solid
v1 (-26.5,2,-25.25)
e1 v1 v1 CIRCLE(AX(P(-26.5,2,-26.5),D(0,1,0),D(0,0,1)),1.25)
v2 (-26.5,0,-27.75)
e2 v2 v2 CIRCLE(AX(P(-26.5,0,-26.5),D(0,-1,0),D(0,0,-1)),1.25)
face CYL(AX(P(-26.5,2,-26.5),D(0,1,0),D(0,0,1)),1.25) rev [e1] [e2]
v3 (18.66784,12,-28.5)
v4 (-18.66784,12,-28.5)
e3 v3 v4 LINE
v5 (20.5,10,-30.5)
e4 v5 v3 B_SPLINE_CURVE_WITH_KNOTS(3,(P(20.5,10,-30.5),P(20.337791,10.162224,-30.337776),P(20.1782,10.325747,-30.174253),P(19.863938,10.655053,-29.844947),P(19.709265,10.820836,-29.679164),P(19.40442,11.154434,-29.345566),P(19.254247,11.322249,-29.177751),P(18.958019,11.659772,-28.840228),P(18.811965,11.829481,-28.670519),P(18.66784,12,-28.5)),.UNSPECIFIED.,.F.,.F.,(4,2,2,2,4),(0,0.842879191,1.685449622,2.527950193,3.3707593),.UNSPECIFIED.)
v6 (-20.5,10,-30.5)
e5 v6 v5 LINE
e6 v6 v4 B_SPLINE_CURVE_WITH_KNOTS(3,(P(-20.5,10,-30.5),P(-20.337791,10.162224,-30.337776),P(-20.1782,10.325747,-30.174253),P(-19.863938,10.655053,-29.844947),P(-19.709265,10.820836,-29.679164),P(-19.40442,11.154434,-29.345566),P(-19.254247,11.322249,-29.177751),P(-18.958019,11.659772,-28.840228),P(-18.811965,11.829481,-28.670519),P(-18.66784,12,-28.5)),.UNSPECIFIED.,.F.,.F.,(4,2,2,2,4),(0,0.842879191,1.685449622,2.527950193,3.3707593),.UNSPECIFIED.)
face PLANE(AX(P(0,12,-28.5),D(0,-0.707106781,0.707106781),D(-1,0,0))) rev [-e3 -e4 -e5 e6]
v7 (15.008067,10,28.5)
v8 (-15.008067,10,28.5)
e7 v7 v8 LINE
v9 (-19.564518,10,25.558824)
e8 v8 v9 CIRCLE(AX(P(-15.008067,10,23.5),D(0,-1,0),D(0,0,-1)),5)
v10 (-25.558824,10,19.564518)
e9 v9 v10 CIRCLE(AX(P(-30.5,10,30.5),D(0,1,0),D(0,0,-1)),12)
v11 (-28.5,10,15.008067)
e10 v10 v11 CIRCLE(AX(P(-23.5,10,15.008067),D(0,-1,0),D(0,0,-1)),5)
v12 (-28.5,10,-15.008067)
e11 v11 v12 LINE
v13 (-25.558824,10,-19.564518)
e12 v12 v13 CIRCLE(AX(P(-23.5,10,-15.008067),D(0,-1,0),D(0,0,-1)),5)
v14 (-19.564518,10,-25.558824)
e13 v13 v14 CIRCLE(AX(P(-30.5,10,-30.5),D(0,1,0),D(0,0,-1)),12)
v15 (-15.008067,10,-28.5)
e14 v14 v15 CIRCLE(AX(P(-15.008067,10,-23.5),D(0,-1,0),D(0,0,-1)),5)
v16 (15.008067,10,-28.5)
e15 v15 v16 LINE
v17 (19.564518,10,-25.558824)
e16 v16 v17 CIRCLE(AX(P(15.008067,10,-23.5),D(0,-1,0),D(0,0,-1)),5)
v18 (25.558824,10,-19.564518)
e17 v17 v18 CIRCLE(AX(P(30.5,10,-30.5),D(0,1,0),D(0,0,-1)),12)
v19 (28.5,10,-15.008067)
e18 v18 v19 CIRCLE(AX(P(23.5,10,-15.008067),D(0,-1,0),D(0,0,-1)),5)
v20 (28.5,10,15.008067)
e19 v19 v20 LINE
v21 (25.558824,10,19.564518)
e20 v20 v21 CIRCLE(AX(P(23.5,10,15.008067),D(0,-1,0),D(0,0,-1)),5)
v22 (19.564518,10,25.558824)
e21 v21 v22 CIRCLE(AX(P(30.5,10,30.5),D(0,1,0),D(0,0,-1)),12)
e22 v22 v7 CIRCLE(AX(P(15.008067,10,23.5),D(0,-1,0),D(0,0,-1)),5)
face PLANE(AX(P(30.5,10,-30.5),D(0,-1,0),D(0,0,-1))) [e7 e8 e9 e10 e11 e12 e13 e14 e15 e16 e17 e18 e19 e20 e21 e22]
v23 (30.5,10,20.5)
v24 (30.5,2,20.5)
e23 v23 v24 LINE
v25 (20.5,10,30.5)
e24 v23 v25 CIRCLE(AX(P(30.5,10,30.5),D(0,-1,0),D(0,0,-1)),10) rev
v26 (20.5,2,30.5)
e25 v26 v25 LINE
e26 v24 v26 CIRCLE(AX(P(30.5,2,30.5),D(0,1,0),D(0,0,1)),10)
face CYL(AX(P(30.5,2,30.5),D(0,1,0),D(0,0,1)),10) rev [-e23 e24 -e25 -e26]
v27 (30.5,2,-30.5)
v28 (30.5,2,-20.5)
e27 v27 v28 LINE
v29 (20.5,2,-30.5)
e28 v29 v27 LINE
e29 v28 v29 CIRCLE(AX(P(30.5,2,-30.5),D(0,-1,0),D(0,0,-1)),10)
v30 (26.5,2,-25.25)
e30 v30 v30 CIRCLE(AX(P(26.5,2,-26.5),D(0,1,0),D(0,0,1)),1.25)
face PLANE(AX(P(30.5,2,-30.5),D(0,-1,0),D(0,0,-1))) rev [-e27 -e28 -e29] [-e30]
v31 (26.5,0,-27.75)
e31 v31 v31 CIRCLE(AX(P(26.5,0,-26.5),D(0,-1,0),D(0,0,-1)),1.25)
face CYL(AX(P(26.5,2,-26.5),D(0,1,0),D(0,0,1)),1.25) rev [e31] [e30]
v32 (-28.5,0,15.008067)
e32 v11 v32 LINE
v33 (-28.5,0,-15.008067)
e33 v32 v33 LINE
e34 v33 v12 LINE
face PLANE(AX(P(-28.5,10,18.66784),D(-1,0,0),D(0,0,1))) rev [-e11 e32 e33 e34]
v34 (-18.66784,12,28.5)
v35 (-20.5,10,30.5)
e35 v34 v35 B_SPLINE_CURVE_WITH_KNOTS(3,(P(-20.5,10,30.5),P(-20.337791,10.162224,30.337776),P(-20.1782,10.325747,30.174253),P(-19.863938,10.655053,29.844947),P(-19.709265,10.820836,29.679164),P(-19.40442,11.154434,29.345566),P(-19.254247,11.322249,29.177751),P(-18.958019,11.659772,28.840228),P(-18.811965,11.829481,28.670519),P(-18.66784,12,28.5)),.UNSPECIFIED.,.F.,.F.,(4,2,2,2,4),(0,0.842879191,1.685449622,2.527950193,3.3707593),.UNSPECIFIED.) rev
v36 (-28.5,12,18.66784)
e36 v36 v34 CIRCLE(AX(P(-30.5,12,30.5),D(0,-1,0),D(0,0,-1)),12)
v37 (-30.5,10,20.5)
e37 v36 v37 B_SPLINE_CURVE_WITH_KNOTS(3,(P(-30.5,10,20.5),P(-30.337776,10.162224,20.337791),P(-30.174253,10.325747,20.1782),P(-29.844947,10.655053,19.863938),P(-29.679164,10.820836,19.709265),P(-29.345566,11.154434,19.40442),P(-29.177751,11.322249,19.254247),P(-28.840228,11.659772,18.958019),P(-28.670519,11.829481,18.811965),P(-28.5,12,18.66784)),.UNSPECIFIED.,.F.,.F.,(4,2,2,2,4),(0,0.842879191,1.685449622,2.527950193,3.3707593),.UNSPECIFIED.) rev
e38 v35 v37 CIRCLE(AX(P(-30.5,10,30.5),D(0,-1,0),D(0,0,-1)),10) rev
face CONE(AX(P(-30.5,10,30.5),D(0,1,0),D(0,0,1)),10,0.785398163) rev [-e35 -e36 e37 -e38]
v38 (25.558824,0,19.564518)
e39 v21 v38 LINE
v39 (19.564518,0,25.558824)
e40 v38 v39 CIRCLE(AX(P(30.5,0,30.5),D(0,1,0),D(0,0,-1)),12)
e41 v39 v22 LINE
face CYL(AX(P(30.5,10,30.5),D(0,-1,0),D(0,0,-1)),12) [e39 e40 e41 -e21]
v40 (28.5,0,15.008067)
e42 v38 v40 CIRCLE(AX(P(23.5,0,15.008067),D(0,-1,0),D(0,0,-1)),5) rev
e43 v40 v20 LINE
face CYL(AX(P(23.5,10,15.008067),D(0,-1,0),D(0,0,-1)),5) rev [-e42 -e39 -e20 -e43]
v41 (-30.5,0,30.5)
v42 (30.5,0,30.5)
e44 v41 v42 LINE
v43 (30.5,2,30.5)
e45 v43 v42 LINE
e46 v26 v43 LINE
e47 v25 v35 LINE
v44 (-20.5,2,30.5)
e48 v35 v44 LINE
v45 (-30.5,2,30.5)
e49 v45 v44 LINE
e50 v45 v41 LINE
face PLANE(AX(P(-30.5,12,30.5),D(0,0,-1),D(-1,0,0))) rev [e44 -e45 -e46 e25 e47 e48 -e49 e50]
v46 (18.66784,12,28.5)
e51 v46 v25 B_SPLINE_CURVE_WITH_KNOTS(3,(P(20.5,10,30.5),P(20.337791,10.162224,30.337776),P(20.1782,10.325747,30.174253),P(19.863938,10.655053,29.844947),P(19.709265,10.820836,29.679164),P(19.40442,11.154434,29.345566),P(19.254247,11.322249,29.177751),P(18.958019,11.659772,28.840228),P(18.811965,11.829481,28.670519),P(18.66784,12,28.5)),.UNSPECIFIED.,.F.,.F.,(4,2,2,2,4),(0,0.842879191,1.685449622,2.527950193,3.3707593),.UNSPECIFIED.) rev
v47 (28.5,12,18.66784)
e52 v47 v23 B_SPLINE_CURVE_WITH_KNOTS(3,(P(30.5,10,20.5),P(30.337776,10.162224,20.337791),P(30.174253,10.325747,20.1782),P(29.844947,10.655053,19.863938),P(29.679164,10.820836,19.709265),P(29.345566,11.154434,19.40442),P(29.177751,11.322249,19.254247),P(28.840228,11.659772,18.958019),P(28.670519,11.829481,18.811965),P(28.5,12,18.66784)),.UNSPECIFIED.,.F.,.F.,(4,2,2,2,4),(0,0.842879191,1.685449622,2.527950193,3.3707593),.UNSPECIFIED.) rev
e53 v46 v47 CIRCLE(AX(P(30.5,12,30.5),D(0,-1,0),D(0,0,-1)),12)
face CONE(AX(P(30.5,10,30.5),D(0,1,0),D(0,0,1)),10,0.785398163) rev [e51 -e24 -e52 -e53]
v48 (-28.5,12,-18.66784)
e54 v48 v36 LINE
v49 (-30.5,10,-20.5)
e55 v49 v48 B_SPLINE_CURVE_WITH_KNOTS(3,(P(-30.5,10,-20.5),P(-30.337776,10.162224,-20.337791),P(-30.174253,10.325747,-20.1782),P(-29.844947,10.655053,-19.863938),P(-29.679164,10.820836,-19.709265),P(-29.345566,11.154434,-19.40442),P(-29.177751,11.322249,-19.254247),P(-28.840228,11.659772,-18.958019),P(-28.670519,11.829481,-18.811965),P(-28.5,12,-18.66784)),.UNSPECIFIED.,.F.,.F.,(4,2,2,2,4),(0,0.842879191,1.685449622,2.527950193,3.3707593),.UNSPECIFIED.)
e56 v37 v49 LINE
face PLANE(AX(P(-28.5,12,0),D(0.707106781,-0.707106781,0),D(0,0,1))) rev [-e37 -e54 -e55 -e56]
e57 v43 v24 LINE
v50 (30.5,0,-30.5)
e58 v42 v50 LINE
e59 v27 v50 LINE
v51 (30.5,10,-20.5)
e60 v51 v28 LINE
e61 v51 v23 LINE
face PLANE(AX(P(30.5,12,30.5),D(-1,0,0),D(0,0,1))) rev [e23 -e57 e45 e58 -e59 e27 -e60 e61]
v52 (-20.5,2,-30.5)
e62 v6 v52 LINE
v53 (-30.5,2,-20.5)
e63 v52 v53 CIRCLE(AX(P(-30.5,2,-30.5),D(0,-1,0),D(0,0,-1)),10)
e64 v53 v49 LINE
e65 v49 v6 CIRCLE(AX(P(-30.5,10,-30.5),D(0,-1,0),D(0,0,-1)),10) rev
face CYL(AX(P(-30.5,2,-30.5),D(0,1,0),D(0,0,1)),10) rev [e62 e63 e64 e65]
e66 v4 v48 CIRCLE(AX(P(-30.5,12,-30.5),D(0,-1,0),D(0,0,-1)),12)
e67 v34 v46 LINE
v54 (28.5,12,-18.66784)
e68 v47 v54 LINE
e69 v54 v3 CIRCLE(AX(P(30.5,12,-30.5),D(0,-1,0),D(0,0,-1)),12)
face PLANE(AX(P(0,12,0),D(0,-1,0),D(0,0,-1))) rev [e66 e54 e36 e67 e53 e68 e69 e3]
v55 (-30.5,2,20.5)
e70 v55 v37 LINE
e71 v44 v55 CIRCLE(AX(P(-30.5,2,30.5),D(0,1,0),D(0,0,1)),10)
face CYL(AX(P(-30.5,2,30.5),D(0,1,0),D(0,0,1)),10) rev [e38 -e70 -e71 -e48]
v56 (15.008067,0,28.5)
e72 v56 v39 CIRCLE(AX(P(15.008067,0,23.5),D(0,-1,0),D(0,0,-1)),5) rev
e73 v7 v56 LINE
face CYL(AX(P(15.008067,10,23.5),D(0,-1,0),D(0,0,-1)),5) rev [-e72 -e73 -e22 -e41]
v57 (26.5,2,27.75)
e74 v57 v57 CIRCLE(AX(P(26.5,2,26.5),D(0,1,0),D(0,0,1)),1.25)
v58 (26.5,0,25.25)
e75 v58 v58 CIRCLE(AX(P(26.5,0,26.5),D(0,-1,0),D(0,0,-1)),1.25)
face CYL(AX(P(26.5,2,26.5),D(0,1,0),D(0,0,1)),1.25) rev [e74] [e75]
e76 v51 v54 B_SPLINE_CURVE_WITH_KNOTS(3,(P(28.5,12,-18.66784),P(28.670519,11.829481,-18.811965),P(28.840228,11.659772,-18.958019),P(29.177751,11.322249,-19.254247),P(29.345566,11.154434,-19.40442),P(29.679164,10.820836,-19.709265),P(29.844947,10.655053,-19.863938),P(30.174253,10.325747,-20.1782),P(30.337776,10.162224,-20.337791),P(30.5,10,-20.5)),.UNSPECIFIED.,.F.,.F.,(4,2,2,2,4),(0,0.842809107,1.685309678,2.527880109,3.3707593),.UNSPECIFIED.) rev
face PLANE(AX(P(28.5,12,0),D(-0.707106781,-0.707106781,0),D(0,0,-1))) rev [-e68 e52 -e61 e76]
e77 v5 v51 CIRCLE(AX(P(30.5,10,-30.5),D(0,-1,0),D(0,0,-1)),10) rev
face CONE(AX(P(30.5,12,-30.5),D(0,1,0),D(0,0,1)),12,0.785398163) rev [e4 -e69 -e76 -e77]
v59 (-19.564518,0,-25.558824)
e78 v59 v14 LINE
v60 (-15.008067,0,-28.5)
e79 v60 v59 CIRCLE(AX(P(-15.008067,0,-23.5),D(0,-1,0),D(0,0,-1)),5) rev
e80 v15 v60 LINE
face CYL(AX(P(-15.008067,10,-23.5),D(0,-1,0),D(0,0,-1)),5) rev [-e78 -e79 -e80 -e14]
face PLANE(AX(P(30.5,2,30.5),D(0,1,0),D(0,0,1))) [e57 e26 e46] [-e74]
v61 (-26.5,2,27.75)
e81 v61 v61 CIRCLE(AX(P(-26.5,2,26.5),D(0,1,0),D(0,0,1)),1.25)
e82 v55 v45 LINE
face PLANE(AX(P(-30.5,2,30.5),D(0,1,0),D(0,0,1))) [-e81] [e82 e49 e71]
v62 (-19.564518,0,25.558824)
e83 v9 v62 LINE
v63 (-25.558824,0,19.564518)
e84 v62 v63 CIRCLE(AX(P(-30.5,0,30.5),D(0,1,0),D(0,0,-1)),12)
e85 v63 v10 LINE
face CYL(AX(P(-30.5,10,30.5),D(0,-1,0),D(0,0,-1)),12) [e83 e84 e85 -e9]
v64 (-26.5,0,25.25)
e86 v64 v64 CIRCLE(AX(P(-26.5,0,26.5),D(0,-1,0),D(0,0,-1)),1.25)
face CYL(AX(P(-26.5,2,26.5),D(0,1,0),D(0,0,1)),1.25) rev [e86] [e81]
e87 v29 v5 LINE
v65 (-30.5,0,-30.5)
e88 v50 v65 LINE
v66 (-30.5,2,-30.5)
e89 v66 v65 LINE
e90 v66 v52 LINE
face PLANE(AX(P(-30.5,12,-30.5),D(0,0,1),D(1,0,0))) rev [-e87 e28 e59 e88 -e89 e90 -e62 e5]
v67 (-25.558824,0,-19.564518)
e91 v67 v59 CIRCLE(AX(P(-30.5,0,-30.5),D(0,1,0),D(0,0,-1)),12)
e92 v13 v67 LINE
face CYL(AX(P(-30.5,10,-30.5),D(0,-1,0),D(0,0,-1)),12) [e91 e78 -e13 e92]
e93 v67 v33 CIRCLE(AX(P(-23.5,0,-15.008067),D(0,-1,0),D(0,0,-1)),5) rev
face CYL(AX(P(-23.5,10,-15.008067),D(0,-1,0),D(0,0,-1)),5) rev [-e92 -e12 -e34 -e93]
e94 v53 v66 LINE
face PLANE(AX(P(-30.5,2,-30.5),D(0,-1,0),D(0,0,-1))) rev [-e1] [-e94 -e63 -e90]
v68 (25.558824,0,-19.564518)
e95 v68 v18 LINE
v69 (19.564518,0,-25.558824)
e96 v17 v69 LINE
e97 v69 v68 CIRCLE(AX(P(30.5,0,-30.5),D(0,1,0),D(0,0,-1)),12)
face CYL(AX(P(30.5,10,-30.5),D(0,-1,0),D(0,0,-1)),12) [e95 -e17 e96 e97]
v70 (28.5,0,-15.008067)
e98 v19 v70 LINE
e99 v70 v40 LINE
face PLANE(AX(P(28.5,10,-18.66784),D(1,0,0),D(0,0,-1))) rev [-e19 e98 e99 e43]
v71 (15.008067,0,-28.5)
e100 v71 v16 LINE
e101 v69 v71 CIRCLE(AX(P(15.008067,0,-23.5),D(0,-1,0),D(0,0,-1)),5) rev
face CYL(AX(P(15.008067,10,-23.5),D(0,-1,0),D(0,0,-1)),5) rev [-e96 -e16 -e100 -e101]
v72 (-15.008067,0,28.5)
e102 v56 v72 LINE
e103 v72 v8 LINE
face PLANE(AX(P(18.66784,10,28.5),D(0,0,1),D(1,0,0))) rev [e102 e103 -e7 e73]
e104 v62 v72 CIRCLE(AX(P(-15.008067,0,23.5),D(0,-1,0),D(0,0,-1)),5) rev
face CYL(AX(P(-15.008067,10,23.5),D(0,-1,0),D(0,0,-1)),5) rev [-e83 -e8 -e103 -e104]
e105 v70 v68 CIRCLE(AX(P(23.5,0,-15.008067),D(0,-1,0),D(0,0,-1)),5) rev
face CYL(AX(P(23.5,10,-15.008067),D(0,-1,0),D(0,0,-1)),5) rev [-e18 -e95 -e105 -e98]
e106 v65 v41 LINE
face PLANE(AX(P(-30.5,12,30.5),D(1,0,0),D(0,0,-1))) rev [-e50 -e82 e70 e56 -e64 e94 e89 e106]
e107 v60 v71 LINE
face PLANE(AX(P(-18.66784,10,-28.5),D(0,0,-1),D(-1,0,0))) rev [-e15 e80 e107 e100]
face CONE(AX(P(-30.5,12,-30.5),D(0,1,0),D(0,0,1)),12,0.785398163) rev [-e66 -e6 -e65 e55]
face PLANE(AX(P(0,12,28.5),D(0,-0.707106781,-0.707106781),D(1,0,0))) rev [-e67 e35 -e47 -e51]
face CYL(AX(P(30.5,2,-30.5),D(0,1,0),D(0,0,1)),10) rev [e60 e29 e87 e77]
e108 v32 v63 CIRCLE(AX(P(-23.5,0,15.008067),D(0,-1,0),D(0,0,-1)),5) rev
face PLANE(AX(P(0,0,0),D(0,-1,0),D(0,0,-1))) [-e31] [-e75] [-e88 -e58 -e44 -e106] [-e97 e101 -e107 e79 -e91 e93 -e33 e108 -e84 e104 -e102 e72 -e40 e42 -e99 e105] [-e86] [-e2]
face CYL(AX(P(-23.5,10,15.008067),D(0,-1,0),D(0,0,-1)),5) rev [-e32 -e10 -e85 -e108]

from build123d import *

# Parameters (mm, degrees)
SKETCH2_W           = 61
SKETCH2_H           = 61
BOSS_EXTRUDE1_DEPTH = 12
SKETCH4_R           = 10
CUT_EXTRUDE3_DEPTH  = 10
CUT_EXTRUDE5_DEPTH  = 10
FILLET2_SIZE        = 2
FILLET3_R           = 5


with BuildPart() as part:
    # Sketch2 → Boss-Extrude1 (new body)
    with BuildSketch(Plane(origin=(0, 0, 0), x_dir=(1, 0, 0), z_dir=(0, 1, 0))):
        Rectangle(SKETCH2_W, SKETCH2_H)
    extrude(amount=BOSS_EXTRUDE1_DEPTH)

    # Sketch4 → Cut-Extrude3 (cut)
    with BuildSketch(Plane(origin=(0, 12, 0), x_dir=(1, 0, 0), z_dir=(0, 1, 0))):
        with Locations((30.5, -30.5)):
            Circle(SKETCH4_R)
        with Locations((-30.5, -30.5)):
            Circle(SKETCH4_R)
        with Locations((-30.5, 30.5)):
            Circle(SKETCH4_R)
        with Locations((30.5, 30.5)):
            Circle(SKETCH4_R)
    extrude(amount=-CUT_EXTRUDE3_DEPTH, mode=Mode.SUBTRACT)

    # Sketch8 → Cut-Extrude5 (cut)
    with BuildSketch(Plane.XZ):
        with BuildLine():
            Line((-18.667840434, -28.5), (18.667840434, -28.5))
            ThreePointArc((18.667840434, -28.5), (22.014718626, -22.014718626), (28.5, -18.667840434))
            Line((28.5, -18.667840434), (28.5, 18.667840434))
            ThreePointArc((28.5, 18.667840434), (22.014718626, 22.014718626), (18.667840434, 28.5))
            Line((18.667840434, 28.5), (-18.667840434, 28.5))
            ThreePointArc((-18.667840434, 28.5), (-22.014718626, 22.014718626), (-28.5, 18.667840434))
            Line((-28.5, 18.667840434), (-28.5, -18.667840434))
            ThreePointArc((-28.5, -18.667840434), (-22.014718626, -22.014718626), (-18.667840434, -28.5))
        make_face()
    extrude(amount=-CUT_EXTRUDE5_DEPTH, mode=Mode.SUBTRACT)

    # Fillet2
    fillet2_edges = [part.edges().sort_by_distance(p)[0] for p in [
        (30.5, 12, 0),
        (0, 12, -30.5),
        (-30.5, 12, 0),
        (0, 12, 30.5),
        (23.428932188, 12, -23.428932188),
        (-23.428932188, 12, -23.428932188),
        (-23.428932188, 12, 23.428932188),
        (23.428932188, 12, 23.428932188),
    ]]
    chamfer(fillet2_edges, length=FILLET2_SIZE)

    # Sketch15 → M3x0.5 Tapped Hole1 (revolve, cut)
    with BuildSketch(Plane(origin=(26.5, 2, 26.5), x_dir=(0, 0, 1), z_dir=(1, 0, 0))):
        Polygon((0, 0), (0, 8.251075774), (1.25, 7.5), (1.25, 0), align=None)
    m3x0_5_tapped_hole1 = revolve(axis=Axis((26.5, 8.35, 26.5), (0, -1, 0)), mode=Mode.SUBTRACT)

    # Mirror1: M3x0.5 Tapped Hole1 across plane
    add(m3x0_5_tapped_hole1.mirror(Plane.XY), mode=Mode.SUBTRACT)

    # Mirror2: M3x0.5 Tapped Hole1 across plane
    add(m3x0_5_tapped_hole1.mirror(Plane(origin=(0, 0, 0), x_dir=(0, 0, 1), z_dir=(1, 0, 0))), mode=Mode.SUBTRACT)

    # Mirror2 copy 1 sketch → Mirror2 copy 1 (revolve, cut)
    with BuildSketch(Plane(origin=(-26.5, 2, -26.5), x_dir=(0, 0, -1), z_dir=(-1, 0, 0))):
        Polygon((0, 0), (0, 8.251075774), (1.25, 7.5), (1.25, 0), align=None)
    revolve(axis=Axis((-26.5, 8.35, -26.5), (0, -1, 0)), mode=Mode.SUBTRACT)

    # Fillet3
    fillet3_edges = [part.edges().sort_by_distance(p)[0] for p in [
        (28.5, 5, -18.667840434),
        (18.667840434, 5, -28.5),
        (-18.667840434, 5, -28.5),
        (-28.5, 5, -18.667840434),
        (-28.5, 5, 18.667840434),
        (-18.667840434, 5, 28.5),
        (18.667840434, 5, 28.5),
        (28.5, 5, 18.667840434),
    ]]
    fillet(fillet3_edges, radius=FILLET3_R)


solid = part.part
